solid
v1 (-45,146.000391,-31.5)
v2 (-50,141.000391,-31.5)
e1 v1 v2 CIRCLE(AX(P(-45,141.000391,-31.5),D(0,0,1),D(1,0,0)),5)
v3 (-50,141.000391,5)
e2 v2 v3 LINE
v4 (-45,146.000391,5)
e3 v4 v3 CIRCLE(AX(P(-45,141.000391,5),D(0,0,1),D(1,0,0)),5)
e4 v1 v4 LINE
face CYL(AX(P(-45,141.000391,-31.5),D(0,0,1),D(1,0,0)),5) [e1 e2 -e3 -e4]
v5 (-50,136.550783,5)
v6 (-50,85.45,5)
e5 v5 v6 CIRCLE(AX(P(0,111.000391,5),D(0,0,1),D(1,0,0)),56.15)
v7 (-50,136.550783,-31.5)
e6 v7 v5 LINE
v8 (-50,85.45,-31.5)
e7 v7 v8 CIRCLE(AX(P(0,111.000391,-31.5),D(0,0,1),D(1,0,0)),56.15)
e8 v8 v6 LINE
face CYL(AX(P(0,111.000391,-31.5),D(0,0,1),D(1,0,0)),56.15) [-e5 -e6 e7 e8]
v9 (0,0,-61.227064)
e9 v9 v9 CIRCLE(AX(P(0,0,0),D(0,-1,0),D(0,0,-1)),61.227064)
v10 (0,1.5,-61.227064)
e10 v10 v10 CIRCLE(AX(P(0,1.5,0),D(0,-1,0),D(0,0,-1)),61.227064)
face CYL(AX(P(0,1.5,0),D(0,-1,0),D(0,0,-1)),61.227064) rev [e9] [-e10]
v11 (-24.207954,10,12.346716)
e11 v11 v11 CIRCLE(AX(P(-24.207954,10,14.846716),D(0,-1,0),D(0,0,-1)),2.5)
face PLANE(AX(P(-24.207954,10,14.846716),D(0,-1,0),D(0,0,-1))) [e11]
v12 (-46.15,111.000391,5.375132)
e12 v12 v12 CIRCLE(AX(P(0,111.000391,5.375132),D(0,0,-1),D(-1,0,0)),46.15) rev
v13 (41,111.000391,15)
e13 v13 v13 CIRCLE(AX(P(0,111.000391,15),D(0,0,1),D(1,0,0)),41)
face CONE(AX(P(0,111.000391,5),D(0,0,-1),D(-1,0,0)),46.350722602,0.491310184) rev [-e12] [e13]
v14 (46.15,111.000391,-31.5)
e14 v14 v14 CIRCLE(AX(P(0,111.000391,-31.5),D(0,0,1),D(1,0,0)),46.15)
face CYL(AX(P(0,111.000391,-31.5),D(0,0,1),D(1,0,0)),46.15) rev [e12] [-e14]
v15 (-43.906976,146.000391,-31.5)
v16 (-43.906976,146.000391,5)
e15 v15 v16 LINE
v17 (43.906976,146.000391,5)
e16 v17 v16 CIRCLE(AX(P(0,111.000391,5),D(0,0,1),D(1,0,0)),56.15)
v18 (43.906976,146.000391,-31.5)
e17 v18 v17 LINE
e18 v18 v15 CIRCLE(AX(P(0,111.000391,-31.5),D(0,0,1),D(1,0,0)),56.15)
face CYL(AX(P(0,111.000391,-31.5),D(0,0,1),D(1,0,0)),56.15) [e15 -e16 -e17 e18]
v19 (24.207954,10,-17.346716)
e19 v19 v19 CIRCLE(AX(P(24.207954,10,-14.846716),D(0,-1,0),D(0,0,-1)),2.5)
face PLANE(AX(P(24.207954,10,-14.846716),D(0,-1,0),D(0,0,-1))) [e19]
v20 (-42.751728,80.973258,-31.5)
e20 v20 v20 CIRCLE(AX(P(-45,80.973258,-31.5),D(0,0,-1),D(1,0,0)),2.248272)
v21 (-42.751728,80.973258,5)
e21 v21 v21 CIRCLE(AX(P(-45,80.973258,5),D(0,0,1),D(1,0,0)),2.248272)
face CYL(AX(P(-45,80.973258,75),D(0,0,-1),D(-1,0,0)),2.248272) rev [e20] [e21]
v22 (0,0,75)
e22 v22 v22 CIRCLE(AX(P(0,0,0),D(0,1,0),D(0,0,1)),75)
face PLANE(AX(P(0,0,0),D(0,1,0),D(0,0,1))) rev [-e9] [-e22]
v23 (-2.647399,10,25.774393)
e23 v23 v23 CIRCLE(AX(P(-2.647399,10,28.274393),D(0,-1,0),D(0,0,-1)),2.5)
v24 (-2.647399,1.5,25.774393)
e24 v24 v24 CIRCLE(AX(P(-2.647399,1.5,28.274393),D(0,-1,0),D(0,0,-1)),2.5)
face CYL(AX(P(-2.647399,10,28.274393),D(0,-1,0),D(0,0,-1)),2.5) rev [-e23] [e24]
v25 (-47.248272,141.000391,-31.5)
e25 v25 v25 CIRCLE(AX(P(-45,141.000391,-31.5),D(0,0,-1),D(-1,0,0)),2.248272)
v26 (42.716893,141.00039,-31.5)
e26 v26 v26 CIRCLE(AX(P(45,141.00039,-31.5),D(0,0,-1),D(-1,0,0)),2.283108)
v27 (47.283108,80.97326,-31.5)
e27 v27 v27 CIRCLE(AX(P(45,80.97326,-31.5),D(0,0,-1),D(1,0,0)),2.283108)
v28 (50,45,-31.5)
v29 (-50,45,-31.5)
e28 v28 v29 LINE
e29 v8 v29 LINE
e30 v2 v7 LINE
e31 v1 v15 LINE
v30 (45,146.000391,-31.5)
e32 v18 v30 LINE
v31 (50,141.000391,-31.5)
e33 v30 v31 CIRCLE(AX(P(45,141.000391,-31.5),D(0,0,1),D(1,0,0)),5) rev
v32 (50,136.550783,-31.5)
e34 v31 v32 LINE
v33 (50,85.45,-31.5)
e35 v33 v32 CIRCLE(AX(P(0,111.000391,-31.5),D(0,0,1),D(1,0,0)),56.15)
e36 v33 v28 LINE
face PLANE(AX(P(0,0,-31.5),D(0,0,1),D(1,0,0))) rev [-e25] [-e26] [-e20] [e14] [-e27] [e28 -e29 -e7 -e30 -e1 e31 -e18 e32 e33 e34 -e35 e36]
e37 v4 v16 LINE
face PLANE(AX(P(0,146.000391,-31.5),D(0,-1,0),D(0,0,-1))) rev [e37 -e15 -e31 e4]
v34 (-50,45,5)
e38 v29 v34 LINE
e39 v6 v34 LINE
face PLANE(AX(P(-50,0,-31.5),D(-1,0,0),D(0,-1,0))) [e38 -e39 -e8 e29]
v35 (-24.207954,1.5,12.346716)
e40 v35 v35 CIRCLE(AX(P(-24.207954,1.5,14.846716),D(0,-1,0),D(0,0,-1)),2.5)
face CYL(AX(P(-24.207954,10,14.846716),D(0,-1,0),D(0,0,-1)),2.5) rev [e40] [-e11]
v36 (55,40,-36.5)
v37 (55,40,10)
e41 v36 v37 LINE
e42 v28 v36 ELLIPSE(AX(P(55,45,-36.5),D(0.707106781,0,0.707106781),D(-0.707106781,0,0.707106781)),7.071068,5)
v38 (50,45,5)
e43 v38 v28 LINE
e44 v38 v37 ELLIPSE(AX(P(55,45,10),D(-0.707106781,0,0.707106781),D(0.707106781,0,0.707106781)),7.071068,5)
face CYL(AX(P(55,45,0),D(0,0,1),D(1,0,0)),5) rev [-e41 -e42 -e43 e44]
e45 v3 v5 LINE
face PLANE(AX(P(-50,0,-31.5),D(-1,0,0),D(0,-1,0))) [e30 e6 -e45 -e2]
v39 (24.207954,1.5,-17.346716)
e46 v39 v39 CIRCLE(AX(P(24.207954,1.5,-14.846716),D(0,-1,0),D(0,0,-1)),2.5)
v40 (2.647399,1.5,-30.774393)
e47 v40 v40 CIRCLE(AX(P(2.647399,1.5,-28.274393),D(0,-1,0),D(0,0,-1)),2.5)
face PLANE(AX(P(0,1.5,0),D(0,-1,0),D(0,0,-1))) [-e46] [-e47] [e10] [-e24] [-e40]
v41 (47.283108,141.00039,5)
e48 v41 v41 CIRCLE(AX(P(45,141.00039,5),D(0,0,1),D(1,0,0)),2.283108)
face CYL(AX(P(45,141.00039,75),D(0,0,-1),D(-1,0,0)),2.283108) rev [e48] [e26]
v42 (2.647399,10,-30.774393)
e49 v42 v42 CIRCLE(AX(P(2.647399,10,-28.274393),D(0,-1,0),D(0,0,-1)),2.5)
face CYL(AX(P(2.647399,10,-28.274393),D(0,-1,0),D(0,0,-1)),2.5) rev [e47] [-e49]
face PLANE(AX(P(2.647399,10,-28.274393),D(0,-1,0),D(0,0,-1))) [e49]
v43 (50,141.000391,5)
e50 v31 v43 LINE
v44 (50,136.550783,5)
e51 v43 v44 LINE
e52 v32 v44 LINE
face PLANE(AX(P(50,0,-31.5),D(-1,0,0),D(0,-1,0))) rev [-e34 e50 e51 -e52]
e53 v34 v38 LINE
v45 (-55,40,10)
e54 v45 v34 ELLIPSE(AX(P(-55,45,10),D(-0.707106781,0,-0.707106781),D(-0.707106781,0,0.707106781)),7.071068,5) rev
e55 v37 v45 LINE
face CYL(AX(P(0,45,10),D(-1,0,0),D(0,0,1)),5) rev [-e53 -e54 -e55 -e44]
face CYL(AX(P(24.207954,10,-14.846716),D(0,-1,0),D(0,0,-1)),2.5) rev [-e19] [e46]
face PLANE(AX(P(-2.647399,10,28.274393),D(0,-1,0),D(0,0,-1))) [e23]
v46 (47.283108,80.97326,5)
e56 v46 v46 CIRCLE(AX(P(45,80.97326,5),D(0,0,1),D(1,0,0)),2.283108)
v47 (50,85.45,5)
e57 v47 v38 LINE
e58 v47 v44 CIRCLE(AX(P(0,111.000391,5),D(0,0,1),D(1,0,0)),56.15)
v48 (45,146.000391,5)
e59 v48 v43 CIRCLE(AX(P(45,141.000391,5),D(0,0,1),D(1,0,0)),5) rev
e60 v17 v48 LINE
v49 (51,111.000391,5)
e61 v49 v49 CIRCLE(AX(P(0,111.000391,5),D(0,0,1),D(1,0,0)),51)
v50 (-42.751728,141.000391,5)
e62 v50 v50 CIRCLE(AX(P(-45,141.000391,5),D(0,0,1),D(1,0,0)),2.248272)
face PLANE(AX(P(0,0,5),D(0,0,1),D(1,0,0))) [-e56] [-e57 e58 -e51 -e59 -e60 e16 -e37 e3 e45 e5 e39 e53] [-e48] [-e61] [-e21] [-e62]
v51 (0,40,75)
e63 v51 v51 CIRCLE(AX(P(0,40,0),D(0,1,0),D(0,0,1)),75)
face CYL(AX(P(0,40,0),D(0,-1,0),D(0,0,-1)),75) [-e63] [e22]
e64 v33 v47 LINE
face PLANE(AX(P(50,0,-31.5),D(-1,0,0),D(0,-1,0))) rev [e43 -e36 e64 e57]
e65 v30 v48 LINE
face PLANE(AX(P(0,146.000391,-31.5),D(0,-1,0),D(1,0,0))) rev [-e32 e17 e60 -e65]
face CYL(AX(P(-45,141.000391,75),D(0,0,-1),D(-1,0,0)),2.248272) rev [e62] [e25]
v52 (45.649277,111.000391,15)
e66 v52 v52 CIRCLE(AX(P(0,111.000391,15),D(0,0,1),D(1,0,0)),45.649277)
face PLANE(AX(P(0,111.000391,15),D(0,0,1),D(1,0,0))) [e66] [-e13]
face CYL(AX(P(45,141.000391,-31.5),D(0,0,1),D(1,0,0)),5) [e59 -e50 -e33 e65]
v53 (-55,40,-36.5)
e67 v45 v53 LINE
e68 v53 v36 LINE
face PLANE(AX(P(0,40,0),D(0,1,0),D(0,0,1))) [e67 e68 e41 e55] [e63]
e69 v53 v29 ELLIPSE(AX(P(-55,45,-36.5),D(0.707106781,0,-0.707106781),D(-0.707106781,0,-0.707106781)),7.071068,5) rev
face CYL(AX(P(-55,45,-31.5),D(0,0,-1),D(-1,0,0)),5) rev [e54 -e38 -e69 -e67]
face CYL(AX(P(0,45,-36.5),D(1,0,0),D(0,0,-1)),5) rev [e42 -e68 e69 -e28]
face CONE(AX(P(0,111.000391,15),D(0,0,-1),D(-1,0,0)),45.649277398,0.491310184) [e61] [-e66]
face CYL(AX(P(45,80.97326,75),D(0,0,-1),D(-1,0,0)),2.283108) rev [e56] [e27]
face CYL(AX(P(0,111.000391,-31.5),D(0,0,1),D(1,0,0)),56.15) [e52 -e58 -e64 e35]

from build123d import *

# Parameters (mm, degrees)
CROQUIS1_R              = 75
SALIENTE_EXTRUIR1_DEPTH = 40
SALIENTE_EXTRUIR2_START = 5
CROQUIS3_R              = 46.15
SALIENTE_EXTRUIR2_DEPTH = 36.5
CROQUIS5_R              = 51
CROQUIS5_R_2            = 41
SALIENTE_EXTRUIR3_DEPTH = 10
CHAFL_N1_SIZE           = 5.350722602
CHAFL_N1_SIZE_2         = 10
CHAFL_N2_SIZE2          = 10
CHAFL_N2_SIZE           = 5.350722602
REDONDEO1_R             = 5
CROQUIS7_R              = 2.248271999
CROQUIS7_R_2            = 2.28310755
CORTAR_EXTRUIR2_DEPTH   = 212.91154603
CROQUIS8_R              = 61.227064255
CORTAR_EXTRUIR3_DEPTH   = 1.5
CROQUIS8_3_R            = 2.5
CORTAR_EXTRUIR4_DEPTH   = 10


# Some blends are built 0.0001 mm under size
with BuildPart() as part:
    # Croquis1 → Saliente-Extruir1 (new body)
    with BuildSketch(Plane(origin=(0, 0, 0), x_dir=(1, 0, 0), z_dir=(0, 1, 0))):
        with Locations(Location((0, 0, 0), (0, 0, 270))):
            Circle(CROQUIS1_R)
    extrude(amount=SALIENTE_EXTRUIR1_DEPTH)

    # Croquis3 → Saliente-Extruir2 (add)
    with BuildSketch(Plane.XY.offset(SALIENTE_EXTRUIR2_START)):
        with BuildLine():
            Line((45, 146.000391386), (43.906975528, 146.000391386))
            ThreePointArc((43.906975528, 146.000391386), (0, 167.150391386), (-43.906975528, 146.000391386))
            Line((-43.906975528, 146.000391386), (-45, 146.000391386))
            ThreePointArc((-45, 146.000391386), (-48.535533906, 144.535925292), (-50, 141.000391386))
            Line((-50, 141.000391386), (-50, 136.550782773))
            ThreePointArc((-50, 136.550782773), (-56.15, 111.000391386), (-50, 85.45))
            Line((-50, 85.45), (-50, 40))
            Line((-50, 40), (50, 40))
            Line((50, 40), (50, 85.45))
            ThreePointArc((50, 85.45), (56.15, 111.000391386), (50, 136.550782773))
            Line((50, 136.550782773), (50, 141.000391386))
            ThreePointArc((50, 141.000391386), (48.535533906, 144.535925292), (45, 146.000391386))
        make_face()
        with Locations((0, 111.000391386)):
            Circle(CROQUIS3_R, mode=Mode.SUBTRACT)
    extrude(amount=-SALIENTE_EXTRUIR2_DEPTH)

    # Croquis5 → Saliente-Extruir3 (add)
    with BuildSketch(Plane.XY.offset(5)):
        with Locations((0, 111.000391386)):
            Circle(CROQUIS5_R)
        with Locations((0, 111.000391386)):
            Circle(CROQUIS5_R_2, mode=Mode.SUBTRACT)
    extrude(amount=SALIENTE_EXTRUIR3_DEPTH)

    # Chaflán1
    # the kernel refuses this chamfer: 10, 5.350722602 mm, written as the material it takes off along each edge
    with BuildSketch(Plane(origin=(0, 111.000391386, 5), x_dir=(1, 0, 0), z_dir=(0, -1, 0))) as chafl_n1_piece_1_section:
        Polygon((41 + CHAFL_N1_SIZE, 0), (41, CHAFL_N1_SIZE_2), (41, 0), align=None)
    chafl_n1_piece_1 = revolve(axis=Axis((0, 111.000391386, 5), (0, 0, 1)), mode=Mode.PRIVATE)
    chafl_n1_piece_1 = chafl_n1_piece_1 & Plane(origin=(0, 111.000391386, 10.096546519), x_dir=(1, 0, 0), z_dir=(0, 0, 1)) * Cylinder(46.15, 186, mode=Mode.PRIVATE)
    add(chafl_n1_piece_1, mode=Mode.SUBTRACT)

    # Chaflán2
    chafl_n2_edges = [part.edges().sort_by_distance(p)[0] for p in [
        (-51, 111.000391386, 15),
    ]]
    chafl_n2_side = [part.faces().sort_by_distance(p)[0] for p in [
        (-50.892985548, 111.000391386, 15),
    ]]
    chamfer(chafl_n2_edges, length=CHAFL_N2_SIZE - 0.0001, length2=CHAFL_N2_SIZE2 - 0.0001, reference=chafl_n2_side[0])  # a hair under: the kernel refuses the full size

    # Redondeo1
    redondeo1_edges = [part.edges().sort_by_distance(p)[0] for p in [
        (0, 40, 5),
        (0, 40, -31.5),
        (50, 40, -13.25),
        (-50, 40, -13.25),
    ]]
    fillet(redondeo1_edges, radius=REDONDEO1_R)

    # Croquis7 → Cortar-Extruir2 (cut, through all)
    with BuildSketch(Plane(origin=(0, 0, -31.5), x_dir=(-1, 0, 0), z_dir=(0, 0, -1))):
        with Locations((45, 141.000391386)):
            Circle(CROQUIS7_R)
        with Locations((-45.000000475, 141.000390201)):
            Circle(CROQUIS7_R_2)
        with Locations(Location((-45.000000475, 80.973259529, 0), (0, 0, 180))):
            Circle(CROQUIS7_R_2)
        with Locations(Location((45, 80.973258343, 0), (0, 0, 180))):
            Circle(CROQUIS7_R)
    extrude(amount=-CORTAR_EXTRUIR2_DEPTH, mode=Mode.SUBTRACT)

    # Croquis8 → Cortar-Extruir3 (cut)
    with BuildSketch(Plane.XZ):
        with Locations(Location((0, 0, 0), (0, 0, 270))):
            Circle(CROQUIS8_R)
    extrude(amount=-CORTAR_EXTRUIR3_DEPTH, mode=Mode.SUBTRACT)

    # Croquis8<3> → Cortar-Extruir4 (cut)
    with BuildSketch(Plane.XZ):
        with Locations(Location((-2.647399238, 28.274392606, 0), (0, 0, 270))):
            Circle(CROQUIS8_3_R)
        with Locations(Location((24.207953628, -14.846716173, 0), (0, 0, 270))):
            Circle(CROQUIS8_3_R)
        with Locations(Location((2.647399238, -28.274392607, 0), (0, 0, 270))):
            Circle(CROQUIS8_3_R)
        with Locations(Location((-24.207953628, 14.846716173, 0), (0, 0, 270))):
            Circle(CROQUIS8_3_R)
    extrude(amount=-CORTAR_EXTRUIR4_DEPTH, mode=Mode.SUBTRACT)


solid = part.part
